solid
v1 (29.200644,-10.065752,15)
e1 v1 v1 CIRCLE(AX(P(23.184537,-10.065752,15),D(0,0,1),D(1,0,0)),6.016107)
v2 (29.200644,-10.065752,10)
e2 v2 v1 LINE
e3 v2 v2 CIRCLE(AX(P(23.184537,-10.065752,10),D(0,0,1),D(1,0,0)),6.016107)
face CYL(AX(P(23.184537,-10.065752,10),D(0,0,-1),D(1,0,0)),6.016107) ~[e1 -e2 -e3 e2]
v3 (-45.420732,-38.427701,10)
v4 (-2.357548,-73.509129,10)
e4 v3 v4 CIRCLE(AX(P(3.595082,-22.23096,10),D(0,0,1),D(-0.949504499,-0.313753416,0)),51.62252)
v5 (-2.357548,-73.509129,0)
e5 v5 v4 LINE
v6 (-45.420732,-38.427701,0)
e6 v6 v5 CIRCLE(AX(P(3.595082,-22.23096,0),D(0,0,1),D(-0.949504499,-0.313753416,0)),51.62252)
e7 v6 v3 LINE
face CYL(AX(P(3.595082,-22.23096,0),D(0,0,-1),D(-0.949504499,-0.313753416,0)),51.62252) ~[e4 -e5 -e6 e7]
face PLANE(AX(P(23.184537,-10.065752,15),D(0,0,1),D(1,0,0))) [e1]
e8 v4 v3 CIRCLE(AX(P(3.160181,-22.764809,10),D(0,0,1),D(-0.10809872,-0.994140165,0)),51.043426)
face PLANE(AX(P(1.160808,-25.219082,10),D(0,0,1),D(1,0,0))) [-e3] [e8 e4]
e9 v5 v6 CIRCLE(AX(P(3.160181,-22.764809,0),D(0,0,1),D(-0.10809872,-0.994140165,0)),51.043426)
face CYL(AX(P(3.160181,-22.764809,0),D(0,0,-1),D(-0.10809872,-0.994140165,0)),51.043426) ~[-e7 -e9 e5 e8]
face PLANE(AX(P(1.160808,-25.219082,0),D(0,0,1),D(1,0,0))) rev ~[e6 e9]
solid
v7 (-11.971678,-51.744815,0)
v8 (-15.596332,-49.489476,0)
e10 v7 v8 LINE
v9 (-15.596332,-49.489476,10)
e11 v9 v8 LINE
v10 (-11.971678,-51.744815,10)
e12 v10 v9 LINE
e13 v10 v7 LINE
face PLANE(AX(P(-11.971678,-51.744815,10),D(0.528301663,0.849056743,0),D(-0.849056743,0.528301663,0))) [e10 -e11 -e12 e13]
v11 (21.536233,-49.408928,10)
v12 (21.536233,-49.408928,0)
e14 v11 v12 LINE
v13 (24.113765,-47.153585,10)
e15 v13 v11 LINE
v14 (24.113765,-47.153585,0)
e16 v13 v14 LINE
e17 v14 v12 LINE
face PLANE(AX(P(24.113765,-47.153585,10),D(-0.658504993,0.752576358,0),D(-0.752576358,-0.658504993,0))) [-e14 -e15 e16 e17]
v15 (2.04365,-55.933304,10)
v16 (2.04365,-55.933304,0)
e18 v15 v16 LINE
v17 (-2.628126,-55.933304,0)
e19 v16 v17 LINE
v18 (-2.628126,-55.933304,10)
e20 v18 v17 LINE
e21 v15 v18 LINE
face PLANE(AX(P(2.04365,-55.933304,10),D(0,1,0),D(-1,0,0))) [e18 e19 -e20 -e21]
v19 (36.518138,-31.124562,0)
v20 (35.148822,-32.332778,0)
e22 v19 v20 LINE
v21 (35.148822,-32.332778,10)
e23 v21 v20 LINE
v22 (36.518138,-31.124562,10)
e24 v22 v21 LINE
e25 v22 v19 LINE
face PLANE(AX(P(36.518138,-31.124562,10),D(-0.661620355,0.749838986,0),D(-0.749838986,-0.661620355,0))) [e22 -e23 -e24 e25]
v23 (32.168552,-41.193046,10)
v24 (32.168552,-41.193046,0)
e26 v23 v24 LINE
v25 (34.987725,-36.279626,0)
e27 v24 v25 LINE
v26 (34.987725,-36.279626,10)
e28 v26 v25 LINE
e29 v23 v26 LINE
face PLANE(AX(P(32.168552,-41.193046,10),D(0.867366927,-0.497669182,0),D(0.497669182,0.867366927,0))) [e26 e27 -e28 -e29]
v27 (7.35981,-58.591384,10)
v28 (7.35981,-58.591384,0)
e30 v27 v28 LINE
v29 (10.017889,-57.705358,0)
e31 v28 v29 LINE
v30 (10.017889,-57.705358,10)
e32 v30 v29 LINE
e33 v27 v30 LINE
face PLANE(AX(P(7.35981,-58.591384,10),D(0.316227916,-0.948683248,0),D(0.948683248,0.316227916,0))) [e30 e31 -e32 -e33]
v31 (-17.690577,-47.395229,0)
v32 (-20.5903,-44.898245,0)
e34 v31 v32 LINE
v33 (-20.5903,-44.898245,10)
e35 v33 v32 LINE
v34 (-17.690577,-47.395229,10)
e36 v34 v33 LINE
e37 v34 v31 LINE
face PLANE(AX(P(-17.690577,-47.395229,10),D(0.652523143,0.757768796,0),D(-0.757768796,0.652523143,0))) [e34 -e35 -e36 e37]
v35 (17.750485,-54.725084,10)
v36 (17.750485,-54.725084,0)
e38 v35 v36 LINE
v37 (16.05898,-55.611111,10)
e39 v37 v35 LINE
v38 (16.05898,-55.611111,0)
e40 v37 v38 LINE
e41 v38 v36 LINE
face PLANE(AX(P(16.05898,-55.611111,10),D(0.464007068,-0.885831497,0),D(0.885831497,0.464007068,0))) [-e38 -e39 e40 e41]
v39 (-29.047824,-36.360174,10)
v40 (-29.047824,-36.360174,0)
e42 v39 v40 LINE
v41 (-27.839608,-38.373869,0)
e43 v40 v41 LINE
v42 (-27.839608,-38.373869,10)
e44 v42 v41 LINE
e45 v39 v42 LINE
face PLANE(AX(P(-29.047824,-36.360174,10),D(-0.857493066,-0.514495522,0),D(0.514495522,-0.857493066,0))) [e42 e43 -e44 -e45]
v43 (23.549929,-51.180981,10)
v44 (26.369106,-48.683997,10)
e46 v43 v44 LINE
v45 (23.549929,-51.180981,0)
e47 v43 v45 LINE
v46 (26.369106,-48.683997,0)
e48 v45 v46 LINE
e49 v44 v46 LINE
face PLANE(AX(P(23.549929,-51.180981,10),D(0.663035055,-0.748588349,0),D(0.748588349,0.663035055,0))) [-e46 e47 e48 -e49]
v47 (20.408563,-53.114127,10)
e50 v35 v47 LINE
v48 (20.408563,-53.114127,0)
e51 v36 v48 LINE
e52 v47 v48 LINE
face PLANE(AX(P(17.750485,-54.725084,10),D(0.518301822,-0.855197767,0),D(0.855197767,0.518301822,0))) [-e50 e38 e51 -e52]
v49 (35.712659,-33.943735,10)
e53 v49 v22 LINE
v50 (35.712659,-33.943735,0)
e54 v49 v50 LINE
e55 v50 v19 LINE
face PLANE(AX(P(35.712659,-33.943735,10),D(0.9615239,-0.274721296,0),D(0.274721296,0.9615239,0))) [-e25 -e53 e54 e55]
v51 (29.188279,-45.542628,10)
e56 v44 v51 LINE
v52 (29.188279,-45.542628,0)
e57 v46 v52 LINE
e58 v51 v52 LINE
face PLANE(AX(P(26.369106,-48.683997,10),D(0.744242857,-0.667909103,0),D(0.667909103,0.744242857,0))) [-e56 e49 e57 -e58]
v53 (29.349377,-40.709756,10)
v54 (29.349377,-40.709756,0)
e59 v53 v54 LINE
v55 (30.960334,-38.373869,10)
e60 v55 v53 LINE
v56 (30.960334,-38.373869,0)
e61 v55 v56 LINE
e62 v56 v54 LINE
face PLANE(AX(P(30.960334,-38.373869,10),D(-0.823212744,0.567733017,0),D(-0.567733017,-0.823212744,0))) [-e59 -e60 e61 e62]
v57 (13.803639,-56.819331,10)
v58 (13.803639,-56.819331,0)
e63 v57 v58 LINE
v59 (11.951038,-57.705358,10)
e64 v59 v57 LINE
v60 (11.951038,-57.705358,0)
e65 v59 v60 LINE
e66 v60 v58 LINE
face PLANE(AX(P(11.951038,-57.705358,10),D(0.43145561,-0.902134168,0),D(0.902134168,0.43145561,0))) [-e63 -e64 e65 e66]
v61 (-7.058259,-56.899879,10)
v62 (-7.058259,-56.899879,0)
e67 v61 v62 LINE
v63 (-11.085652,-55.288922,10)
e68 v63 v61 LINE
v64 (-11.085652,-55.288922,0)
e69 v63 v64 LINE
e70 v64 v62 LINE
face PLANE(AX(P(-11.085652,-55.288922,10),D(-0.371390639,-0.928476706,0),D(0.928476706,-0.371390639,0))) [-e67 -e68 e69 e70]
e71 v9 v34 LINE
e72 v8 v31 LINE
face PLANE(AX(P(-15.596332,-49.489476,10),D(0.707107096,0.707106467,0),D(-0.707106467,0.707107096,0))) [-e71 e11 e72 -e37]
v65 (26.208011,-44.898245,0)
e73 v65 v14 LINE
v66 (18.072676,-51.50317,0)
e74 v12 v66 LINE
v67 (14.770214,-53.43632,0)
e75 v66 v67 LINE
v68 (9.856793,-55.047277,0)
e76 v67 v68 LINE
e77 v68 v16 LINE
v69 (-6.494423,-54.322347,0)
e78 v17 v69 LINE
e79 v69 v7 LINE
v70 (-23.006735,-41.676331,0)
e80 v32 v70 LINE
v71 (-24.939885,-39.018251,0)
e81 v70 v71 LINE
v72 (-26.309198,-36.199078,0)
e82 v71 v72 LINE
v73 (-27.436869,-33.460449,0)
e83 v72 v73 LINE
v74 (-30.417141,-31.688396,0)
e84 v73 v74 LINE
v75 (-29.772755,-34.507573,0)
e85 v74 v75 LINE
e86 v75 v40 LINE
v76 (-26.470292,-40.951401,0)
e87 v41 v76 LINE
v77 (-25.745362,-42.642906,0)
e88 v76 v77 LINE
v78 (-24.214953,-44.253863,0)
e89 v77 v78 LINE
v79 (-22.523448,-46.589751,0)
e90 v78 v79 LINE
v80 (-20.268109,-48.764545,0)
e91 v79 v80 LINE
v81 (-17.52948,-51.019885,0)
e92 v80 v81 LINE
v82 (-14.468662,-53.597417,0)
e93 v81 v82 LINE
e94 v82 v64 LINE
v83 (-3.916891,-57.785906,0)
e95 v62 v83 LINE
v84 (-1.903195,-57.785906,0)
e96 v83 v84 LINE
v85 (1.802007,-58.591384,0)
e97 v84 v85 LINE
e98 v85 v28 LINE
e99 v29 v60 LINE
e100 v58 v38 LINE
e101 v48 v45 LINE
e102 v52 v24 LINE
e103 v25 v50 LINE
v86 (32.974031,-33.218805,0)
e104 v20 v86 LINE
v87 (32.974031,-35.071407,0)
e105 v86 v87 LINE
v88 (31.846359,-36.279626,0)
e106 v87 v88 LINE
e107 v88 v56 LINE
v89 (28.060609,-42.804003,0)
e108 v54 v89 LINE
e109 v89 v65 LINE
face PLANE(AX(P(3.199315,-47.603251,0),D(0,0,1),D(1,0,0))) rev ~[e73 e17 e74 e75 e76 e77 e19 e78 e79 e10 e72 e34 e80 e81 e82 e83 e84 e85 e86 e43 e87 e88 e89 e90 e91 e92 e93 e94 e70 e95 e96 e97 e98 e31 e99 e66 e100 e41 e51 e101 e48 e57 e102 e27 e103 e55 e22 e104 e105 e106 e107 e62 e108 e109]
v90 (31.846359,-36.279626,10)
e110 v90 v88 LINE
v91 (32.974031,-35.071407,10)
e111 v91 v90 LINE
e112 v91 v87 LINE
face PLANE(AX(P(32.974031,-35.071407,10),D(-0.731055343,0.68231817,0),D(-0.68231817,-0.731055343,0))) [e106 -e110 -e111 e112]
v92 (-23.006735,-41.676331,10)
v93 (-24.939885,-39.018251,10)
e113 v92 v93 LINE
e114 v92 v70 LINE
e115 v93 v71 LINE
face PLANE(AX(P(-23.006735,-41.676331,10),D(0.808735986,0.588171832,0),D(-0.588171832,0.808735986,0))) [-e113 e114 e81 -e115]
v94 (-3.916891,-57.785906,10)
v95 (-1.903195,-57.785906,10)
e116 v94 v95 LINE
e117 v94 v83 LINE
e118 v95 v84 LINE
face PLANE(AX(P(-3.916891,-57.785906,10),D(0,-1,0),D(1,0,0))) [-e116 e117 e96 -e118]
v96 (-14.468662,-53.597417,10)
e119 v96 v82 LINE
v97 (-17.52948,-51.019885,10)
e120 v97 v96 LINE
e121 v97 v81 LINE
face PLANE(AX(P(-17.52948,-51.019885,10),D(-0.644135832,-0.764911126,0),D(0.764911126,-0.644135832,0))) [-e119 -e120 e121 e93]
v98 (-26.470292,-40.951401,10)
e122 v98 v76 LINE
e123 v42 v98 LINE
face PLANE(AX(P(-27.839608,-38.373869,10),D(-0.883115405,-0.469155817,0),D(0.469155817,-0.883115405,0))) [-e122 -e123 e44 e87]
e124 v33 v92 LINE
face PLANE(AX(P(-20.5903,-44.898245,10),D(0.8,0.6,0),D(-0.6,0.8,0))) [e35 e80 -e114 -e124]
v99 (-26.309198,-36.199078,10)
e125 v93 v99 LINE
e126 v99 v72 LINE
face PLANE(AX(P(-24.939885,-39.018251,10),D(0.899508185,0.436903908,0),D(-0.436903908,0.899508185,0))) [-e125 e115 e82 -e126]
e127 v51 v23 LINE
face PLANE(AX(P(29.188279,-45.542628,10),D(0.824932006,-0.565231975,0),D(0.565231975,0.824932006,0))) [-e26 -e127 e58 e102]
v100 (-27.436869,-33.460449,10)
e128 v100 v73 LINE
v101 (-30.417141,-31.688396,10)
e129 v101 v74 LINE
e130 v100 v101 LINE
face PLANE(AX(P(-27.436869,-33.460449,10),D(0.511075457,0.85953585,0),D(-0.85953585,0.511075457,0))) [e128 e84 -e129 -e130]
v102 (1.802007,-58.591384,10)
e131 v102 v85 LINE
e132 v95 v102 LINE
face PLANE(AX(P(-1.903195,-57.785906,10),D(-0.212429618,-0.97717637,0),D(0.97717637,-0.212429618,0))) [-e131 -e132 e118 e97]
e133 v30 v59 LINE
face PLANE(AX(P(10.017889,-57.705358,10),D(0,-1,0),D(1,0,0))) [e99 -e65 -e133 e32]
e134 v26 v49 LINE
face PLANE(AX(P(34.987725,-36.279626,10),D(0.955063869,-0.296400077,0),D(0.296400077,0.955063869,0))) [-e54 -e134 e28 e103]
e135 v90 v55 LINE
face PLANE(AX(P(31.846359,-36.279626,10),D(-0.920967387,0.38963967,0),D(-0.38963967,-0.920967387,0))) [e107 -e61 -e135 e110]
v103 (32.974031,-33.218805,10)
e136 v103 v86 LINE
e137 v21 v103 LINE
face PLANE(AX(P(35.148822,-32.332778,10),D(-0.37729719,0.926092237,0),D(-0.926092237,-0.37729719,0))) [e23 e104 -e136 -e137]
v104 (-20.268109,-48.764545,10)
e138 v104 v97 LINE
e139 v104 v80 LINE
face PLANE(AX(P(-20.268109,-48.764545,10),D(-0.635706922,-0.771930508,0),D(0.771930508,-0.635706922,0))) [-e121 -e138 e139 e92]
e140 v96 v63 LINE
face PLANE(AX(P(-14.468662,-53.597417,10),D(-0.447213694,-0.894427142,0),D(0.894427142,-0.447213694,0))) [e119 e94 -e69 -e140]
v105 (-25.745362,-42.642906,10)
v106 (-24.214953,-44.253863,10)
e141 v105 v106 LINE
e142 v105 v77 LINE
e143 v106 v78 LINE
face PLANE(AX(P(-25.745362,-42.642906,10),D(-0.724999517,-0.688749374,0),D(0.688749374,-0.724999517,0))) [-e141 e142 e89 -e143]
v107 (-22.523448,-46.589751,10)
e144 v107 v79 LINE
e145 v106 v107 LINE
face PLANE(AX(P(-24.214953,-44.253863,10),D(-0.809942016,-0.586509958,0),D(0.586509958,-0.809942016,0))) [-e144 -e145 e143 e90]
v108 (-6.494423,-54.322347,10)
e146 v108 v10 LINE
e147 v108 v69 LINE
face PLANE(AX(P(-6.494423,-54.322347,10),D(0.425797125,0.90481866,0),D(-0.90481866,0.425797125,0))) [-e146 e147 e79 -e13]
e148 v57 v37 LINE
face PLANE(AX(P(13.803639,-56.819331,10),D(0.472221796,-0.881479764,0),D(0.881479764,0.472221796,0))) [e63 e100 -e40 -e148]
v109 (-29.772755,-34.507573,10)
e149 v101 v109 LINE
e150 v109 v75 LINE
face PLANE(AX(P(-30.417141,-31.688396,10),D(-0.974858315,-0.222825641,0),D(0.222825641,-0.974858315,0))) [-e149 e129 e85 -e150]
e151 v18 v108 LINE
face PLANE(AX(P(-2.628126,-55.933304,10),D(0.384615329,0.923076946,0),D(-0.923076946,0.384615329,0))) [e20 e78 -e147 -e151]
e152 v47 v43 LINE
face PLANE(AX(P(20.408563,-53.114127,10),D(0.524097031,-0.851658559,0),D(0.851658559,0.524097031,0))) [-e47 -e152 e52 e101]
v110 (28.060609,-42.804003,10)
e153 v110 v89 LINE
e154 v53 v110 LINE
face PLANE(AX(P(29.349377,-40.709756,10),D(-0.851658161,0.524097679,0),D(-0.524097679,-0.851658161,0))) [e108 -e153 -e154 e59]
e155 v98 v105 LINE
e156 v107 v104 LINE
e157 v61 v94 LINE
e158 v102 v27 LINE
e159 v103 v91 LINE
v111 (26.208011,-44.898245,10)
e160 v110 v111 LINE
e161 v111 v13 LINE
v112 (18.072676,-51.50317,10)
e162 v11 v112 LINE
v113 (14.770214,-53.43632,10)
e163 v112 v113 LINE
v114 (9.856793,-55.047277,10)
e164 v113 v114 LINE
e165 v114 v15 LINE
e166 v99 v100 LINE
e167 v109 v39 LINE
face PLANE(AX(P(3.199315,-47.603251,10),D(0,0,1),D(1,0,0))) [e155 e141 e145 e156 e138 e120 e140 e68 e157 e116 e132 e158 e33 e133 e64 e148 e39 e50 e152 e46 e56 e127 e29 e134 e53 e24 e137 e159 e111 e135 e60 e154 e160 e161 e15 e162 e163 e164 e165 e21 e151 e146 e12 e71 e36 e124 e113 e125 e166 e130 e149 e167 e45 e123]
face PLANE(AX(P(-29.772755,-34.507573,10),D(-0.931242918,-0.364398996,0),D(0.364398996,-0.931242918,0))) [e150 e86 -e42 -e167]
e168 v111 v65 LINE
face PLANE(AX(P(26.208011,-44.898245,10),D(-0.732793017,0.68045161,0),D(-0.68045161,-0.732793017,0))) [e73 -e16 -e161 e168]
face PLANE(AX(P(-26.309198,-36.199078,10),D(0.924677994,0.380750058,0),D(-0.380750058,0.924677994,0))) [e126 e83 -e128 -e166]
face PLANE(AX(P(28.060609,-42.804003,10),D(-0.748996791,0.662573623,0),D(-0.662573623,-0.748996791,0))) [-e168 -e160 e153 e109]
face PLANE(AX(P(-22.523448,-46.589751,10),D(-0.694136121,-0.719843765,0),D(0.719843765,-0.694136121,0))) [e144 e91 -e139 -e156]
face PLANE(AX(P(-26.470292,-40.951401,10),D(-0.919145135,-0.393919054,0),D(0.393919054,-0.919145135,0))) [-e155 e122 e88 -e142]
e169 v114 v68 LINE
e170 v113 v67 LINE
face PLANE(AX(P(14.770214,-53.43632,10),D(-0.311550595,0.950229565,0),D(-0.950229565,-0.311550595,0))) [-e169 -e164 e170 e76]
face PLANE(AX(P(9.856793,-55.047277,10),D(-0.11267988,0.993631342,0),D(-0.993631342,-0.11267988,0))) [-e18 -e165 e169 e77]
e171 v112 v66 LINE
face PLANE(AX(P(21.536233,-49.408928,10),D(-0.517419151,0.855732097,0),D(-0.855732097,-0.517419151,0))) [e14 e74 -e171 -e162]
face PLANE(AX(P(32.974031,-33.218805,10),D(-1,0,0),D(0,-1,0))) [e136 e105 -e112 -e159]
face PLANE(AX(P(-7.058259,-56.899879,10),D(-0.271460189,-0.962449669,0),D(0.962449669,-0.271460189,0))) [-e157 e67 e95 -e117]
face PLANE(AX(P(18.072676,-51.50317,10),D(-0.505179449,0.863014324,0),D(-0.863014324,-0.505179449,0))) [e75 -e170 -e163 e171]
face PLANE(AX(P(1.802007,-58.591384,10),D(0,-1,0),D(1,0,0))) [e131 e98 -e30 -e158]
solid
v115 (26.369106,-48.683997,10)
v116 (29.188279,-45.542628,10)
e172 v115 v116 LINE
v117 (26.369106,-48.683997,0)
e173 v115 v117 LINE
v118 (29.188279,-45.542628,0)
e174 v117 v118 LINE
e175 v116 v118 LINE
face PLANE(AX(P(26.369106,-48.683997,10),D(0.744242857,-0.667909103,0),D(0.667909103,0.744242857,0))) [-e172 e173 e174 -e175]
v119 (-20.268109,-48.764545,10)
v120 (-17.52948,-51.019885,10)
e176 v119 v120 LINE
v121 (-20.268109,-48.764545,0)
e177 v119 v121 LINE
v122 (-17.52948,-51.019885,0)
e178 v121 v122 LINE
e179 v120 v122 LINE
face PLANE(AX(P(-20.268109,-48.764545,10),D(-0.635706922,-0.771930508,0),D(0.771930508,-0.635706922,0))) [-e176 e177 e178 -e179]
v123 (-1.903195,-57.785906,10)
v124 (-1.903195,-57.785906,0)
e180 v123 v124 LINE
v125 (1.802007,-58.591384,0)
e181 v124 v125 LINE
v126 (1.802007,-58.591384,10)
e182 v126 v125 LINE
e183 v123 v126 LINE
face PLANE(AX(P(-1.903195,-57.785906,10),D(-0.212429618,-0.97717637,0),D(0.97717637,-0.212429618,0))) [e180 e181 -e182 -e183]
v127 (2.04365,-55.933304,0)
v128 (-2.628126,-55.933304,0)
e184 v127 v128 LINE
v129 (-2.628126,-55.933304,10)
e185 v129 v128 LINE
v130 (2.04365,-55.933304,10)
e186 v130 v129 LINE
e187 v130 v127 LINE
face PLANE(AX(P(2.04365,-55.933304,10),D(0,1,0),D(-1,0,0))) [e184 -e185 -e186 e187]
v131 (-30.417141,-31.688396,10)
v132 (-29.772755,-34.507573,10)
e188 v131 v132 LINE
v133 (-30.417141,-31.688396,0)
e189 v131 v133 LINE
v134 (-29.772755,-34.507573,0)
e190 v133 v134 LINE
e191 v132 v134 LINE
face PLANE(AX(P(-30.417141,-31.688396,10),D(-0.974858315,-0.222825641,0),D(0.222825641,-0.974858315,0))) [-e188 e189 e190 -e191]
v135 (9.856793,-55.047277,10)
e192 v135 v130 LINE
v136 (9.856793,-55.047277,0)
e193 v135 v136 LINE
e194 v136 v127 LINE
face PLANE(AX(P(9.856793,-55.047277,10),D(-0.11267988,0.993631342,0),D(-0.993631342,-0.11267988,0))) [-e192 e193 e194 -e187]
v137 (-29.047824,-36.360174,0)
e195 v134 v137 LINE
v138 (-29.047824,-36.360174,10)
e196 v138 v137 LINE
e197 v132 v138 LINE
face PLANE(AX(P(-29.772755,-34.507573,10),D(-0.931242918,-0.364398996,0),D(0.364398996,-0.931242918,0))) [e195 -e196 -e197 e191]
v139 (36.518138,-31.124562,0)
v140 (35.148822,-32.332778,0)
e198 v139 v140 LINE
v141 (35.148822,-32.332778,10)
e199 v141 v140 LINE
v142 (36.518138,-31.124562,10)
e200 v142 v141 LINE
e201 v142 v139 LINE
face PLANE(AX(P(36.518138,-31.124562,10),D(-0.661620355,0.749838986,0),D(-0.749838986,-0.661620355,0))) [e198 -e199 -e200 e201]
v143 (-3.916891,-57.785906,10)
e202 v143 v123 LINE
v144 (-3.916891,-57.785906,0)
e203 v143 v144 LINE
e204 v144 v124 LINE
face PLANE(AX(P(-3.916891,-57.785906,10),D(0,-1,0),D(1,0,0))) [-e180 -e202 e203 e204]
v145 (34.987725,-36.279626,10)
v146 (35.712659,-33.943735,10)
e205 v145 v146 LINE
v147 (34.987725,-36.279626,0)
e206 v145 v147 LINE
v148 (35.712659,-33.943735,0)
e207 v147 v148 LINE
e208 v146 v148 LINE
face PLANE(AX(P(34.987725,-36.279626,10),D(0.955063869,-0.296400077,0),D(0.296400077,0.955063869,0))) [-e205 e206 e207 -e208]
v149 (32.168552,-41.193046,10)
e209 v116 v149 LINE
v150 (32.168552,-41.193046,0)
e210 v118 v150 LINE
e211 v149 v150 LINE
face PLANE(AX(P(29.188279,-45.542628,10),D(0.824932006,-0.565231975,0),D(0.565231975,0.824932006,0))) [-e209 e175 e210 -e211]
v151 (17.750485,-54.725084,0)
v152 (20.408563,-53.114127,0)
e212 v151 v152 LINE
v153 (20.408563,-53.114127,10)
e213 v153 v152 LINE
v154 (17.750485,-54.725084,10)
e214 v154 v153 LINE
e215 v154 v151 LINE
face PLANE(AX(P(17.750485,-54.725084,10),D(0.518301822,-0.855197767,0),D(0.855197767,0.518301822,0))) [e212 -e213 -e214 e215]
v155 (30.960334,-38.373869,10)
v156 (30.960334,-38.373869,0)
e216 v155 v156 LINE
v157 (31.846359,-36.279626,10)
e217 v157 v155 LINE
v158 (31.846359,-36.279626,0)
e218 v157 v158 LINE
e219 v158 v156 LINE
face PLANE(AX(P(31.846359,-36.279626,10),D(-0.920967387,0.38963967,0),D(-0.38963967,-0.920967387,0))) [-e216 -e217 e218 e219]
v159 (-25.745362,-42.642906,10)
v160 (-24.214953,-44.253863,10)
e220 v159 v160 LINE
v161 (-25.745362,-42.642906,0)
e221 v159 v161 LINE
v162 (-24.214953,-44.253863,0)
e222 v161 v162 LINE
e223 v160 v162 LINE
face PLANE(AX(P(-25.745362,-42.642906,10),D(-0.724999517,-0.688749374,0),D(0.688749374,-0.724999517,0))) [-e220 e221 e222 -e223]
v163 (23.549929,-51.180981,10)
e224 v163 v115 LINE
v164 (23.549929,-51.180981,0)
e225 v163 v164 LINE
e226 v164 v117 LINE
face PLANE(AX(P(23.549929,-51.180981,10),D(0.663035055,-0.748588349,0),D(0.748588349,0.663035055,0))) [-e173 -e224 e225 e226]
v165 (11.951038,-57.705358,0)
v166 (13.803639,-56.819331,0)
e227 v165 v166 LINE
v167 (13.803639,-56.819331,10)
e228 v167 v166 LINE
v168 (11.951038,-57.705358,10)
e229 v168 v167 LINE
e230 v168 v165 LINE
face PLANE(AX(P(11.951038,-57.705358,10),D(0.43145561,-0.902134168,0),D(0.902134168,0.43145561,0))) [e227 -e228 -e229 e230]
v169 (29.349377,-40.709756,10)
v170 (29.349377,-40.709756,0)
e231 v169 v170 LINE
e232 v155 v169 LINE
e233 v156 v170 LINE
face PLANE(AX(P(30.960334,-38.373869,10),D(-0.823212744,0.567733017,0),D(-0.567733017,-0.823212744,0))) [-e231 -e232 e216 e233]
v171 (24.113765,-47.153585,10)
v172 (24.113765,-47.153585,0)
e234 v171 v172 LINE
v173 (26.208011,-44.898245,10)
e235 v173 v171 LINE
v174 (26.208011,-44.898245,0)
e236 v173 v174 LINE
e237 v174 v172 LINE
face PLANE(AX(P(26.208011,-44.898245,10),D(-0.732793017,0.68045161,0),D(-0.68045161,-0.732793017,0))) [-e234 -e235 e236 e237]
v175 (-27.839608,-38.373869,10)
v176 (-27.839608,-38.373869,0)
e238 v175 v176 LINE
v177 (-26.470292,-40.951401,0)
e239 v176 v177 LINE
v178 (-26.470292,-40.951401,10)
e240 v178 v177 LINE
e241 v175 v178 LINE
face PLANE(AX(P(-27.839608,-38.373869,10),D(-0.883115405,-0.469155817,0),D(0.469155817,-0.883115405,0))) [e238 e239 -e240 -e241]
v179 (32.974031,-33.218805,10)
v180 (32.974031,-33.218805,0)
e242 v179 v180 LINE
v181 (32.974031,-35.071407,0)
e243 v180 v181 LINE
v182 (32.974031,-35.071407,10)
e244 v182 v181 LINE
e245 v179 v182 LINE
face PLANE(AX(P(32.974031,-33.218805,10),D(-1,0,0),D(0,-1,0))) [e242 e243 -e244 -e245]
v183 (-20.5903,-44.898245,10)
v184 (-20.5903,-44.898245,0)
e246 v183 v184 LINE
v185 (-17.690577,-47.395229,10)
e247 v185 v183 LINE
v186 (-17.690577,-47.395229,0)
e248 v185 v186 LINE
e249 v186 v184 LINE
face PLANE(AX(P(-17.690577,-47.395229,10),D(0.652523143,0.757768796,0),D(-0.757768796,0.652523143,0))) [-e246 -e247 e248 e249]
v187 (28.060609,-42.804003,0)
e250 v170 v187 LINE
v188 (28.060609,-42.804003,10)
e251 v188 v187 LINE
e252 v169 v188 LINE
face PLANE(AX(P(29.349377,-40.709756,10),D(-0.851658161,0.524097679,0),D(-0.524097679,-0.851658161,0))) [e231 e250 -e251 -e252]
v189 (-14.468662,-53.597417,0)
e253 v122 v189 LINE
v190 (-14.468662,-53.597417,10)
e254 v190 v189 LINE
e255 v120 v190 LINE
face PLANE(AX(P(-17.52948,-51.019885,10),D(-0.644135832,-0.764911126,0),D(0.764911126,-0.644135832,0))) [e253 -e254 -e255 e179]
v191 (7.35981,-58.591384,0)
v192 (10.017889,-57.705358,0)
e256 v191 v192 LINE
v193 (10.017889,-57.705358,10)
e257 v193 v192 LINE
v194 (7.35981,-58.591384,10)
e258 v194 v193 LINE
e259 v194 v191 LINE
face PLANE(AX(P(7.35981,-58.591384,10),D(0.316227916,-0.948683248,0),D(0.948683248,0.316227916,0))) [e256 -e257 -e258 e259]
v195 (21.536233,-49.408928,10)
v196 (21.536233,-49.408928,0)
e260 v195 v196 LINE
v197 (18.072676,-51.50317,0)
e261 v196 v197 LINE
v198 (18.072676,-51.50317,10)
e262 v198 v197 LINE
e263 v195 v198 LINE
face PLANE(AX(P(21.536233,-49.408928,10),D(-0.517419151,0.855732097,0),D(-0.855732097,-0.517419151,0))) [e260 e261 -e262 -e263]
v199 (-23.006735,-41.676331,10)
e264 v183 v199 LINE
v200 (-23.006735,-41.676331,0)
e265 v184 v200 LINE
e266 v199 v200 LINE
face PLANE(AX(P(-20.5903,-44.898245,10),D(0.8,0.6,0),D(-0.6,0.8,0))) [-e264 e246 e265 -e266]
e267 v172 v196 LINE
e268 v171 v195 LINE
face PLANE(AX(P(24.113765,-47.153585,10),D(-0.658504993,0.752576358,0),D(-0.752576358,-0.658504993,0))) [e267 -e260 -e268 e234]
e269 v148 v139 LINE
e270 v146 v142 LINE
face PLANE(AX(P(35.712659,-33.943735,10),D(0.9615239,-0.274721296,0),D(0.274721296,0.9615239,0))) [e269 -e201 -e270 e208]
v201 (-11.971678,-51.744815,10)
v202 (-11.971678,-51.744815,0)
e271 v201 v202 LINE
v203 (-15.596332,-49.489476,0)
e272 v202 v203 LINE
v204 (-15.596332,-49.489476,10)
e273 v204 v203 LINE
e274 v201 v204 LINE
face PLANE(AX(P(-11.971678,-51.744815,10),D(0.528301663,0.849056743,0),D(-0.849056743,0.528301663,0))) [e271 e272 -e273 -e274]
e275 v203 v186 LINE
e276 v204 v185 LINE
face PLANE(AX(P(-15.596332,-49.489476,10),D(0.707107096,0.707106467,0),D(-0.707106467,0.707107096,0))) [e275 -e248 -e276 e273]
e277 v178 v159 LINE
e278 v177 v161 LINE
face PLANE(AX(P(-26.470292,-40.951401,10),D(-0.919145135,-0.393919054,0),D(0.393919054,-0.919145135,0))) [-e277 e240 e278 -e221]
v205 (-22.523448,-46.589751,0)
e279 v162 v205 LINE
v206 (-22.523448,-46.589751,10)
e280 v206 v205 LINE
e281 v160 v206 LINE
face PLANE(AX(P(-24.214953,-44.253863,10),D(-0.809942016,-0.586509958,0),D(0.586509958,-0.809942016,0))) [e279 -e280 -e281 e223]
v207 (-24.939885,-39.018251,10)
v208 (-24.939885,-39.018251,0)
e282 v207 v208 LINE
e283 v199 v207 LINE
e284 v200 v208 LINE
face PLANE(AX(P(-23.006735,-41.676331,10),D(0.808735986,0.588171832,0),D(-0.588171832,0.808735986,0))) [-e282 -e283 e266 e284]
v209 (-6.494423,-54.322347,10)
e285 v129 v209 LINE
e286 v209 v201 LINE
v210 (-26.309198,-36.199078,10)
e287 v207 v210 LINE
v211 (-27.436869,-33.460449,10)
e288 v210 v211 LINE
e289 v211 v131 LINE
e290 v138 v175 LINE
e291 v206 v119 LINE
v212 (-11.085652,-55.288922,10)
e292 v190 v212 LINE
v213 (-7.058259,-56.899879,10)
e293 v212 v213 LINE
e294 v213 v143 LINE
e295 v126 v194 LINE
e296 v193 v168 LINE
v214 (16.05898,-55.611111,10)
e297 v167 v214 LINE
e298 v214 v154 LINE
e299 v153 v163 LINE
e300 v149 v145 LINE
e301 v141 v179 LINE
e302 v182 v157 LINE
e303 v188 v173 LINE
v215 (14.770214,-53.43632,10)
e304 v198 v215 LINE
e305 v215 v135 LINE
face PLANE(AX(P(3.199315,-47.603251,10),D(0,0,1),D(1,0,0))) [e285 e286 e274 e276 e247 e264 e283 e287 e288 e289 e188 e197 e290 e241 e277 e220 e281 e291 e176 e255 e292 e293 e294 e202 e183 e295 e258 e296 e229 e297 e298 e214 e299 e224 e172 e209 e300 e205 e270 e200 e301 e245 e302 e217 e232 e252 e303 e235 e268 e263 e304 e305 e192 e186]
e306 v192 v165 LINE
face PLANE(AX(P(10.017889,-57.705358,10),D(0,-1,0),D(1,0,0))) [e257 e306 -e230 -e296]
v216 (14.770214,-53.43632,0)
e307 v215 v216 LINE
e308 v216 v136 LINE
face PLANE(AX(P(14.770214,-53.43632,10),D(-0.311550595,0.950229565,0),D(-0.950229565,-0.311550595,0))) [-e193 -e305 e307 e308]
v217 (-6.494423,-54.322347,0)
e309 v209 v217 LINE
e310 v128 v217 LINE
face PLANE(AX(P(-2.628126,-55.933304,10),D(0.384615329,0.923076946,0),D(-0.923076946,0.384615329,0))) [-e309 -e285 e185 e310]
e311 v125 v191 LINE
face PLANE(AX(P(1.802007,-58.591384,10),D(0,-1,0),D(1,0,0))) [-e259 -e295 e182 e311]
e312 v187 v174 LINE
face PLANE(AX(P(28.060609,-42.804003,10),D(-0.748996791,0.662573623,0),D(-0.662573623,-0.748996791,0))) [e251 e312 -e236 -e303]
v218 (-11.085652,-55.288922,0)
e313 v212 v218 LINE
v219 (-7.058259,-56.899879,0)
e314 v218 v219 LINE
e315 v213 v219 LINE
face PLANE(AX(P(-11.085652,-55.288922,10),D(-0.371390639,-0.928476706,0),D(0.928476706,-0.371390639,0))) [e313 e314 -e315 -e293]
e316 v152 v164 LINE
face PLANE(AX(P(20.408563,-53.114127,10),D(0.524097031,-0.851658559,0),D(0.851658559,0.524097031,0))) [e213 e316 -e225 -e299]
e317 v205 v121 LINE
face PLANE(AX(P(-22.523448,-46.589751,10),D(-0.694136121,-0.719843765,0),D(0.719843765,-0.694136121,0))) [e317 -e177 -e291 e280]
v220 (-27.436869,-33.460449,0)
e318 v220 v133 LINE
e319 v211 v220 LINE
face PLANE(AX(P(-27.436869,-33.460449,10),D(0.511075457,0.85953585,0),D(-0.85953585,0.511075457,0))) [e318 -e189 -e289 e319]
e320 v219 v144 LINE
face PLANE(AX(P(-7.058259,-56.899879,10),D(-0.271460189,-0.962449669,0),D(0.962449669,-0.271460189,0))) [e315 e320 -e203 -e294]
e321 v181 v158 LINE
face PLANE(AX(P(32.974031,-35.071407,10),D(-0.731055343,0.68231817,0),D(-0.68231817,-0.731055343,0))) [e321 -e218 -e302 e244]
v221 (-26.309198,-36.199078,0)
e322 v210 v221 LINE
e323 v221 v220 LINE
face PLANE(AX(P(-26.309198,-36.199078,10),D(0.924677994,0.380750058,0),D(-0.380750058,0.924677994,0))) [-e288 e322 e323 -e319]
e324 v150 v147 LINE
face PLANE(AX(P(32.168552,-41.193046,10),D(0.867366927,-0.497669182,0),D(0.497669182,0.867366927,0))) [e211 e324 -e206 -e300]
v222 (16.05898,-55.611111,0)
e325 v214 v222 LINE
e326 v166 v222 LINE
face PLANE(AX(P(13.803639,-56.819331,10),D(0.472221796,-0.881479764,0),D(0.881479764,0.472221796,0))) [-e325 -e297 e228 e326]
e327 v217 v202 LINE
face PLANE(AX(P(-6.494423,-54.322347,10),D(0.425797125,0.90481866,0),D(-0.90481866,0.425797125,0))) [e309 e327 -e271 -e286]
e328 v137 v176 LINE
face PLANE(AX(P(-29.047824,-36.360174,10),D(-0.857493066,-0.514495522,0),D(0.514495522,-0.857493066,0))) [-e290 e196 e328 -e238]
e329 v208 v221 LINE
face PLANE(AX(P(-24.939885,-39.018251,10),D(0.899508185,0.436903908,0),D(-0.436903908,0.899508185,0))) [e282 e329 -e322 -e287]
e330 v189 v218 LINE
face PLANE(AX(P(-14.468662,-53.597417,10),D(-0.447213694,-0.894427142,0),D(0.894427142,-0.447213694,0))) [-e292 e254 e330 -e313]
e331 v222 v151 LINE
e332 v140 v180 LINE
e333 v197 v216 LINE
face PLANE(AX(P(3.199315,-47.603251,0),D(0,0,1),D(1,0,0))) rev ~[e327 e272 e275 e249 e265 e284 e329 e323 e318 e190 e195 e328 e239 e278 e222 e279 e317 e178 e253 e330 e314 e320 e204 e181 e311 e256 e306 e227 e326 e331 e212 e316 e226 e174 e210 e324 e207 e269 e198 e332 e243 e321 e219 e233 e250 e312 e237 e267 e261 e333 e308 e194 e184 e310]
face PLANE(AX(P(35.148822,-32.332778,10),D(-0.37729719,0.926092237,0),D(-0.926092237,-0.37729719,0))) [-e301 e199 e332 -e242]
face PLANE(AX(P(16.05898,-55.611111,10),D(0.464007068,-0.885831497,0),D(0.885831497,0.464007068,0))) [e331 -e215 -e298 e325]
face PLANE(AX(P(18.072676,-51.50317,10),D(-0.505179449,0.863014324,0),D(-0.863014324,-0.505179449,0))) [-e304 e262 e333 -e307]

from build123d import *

# Parameters (mm, degrees)
F2_DEPTH  = 10
F3_R      = 6.0161074482
F4_DEPTH  = 5
F9_DEPTH  = 10
F10_DEPTH = 10


# Not quite as in the source:
# - a feature names something its author has since deleted; it is built from what else it names
# - the program builds the solid bodies; features that only make, move or delete a surface that nothing else refers to are left out


with BuildPart() as f2:
    # F1 (on face) → F2 (new body)
    with BuildSketch(Plane.XY):
        with BuildLine():
            ThreePointArc((54.2036075933, -22.7648094296), (-4.7674624295, 27.6592306141), (-45.4207321783, -38.4277013217))
            ThreePointArc((-45.4207321783, -38.4277013217), (-29.0095050887, -62.25377047), (-2.3575475804, -73.5091294881))
            ThreePointArc((-2.3575475804, -73.5091294881), (37.2467444782, -60.7587243792), (54.2036075933, -22.7648094296))
        make_face()
    extrude(amount=F2_DEPTH)

    # F3 (on face) → F4 (join)
    with BuildSketch(Plane.XY.offset(10)):
        with Locations((23.184536978, -10.0657522977)):
            Circle(F3_R)
    extrude(amount=F4_DEPTH)


with BuildPart() as f9:
    # F7 (on face) → F9 (new body, through all)
    with BuildSketch(Plane.XY.offset(10)):
        Polygon((-27.4368692189, -33.4604494274), (-30.4171405733, -31.6883958876), (-29.7727547586, -34.5075726509), (-29.0478244424, -36.3601744175), (-27.8396084905, -38.3738689125), (-26.4702923596, -40.9514009953), (-25.7453620434, -42.6429063082), (-24.2149531841, -44.2538633943), (-22.5234478712, -46.5897507966), (-20.2681086957, -48.7645454705), (-17.5294801593, -51.0198846459), (-14.4686615095, -53.5974167287), (-11.0856518149, -55.2889220417), (-7.0582586341, -56.8998791277), (-3.9168912917, -57.7859058976), (-1.9031949341, -57.7859058976), (1.8020068528, -58.5913844407), (5.6683043949, -58.5913844407), (7.3598097079, -58.5913844407), (10.0178886205, -57.7053576708), (11.9510376826, -57.7053576708), (13.8036385179, -56.8193309009), (16.058979556, -55.6111112237), (17.7504848689, -54.7250844538), (20.4085633159, -53.1141273677), (23.5499292612, -51.1809810996), (26.3691060245, -48.6839972436), (29.1882790625, -45.542627573), (32.1685522795, -41.1930456758), (34.9877253175, -36.2796261907), (35.712659359, -33.9437350631), (36.518137902, -31.1245620251), (35.1488217711, -32.332777977), (32.9740308225, -33.2188047469), (32.9740308225, -35.0714065135), (31.8463593721, -36.2796261907), (30.9603344649, -38.3738689125), (29.3493773788, -40.7097563148), (28.0606094748, -42.8040027618), (26.2080114335, -44.8982454836), (24.1137649864, -47.1535846591), (21.5362329036, -49.4089275599), (18.0726759136, -51.5031702816), (14.7702135146, -53.4363202751), (9.8567930982, -55.0472773612), (2.0436504856, -55.933304131), (-2.628125716, -55.933304131), (-6.4944233745, -54.3223470449), (-11.9716776535, -51.7448149621), (-15.5963320285, -49.4894757867), (-17.6905766129, -47.3952293396), (-20.5902997404, -44.8982454836), (-23.0067353696, -41.6763313115), (-24.939885363, -39.0182510018), (-26.3091977686, -36.1990779638), align=None)
    extrude(amount=-F9_DEPTH)


with BuildPart() as f10:
    # F10 (new, through all): a face of the model
    f10_faces = [f9.part.faces().sort_by_distance(p)[0] for p in [
        (-4.8395499913, -55.7956867711, 10),
    ]]
    extrude(f10_faces, amount=-F10_DEPTH)


solid = Compound([f2.part, f9.part, f10.part])
